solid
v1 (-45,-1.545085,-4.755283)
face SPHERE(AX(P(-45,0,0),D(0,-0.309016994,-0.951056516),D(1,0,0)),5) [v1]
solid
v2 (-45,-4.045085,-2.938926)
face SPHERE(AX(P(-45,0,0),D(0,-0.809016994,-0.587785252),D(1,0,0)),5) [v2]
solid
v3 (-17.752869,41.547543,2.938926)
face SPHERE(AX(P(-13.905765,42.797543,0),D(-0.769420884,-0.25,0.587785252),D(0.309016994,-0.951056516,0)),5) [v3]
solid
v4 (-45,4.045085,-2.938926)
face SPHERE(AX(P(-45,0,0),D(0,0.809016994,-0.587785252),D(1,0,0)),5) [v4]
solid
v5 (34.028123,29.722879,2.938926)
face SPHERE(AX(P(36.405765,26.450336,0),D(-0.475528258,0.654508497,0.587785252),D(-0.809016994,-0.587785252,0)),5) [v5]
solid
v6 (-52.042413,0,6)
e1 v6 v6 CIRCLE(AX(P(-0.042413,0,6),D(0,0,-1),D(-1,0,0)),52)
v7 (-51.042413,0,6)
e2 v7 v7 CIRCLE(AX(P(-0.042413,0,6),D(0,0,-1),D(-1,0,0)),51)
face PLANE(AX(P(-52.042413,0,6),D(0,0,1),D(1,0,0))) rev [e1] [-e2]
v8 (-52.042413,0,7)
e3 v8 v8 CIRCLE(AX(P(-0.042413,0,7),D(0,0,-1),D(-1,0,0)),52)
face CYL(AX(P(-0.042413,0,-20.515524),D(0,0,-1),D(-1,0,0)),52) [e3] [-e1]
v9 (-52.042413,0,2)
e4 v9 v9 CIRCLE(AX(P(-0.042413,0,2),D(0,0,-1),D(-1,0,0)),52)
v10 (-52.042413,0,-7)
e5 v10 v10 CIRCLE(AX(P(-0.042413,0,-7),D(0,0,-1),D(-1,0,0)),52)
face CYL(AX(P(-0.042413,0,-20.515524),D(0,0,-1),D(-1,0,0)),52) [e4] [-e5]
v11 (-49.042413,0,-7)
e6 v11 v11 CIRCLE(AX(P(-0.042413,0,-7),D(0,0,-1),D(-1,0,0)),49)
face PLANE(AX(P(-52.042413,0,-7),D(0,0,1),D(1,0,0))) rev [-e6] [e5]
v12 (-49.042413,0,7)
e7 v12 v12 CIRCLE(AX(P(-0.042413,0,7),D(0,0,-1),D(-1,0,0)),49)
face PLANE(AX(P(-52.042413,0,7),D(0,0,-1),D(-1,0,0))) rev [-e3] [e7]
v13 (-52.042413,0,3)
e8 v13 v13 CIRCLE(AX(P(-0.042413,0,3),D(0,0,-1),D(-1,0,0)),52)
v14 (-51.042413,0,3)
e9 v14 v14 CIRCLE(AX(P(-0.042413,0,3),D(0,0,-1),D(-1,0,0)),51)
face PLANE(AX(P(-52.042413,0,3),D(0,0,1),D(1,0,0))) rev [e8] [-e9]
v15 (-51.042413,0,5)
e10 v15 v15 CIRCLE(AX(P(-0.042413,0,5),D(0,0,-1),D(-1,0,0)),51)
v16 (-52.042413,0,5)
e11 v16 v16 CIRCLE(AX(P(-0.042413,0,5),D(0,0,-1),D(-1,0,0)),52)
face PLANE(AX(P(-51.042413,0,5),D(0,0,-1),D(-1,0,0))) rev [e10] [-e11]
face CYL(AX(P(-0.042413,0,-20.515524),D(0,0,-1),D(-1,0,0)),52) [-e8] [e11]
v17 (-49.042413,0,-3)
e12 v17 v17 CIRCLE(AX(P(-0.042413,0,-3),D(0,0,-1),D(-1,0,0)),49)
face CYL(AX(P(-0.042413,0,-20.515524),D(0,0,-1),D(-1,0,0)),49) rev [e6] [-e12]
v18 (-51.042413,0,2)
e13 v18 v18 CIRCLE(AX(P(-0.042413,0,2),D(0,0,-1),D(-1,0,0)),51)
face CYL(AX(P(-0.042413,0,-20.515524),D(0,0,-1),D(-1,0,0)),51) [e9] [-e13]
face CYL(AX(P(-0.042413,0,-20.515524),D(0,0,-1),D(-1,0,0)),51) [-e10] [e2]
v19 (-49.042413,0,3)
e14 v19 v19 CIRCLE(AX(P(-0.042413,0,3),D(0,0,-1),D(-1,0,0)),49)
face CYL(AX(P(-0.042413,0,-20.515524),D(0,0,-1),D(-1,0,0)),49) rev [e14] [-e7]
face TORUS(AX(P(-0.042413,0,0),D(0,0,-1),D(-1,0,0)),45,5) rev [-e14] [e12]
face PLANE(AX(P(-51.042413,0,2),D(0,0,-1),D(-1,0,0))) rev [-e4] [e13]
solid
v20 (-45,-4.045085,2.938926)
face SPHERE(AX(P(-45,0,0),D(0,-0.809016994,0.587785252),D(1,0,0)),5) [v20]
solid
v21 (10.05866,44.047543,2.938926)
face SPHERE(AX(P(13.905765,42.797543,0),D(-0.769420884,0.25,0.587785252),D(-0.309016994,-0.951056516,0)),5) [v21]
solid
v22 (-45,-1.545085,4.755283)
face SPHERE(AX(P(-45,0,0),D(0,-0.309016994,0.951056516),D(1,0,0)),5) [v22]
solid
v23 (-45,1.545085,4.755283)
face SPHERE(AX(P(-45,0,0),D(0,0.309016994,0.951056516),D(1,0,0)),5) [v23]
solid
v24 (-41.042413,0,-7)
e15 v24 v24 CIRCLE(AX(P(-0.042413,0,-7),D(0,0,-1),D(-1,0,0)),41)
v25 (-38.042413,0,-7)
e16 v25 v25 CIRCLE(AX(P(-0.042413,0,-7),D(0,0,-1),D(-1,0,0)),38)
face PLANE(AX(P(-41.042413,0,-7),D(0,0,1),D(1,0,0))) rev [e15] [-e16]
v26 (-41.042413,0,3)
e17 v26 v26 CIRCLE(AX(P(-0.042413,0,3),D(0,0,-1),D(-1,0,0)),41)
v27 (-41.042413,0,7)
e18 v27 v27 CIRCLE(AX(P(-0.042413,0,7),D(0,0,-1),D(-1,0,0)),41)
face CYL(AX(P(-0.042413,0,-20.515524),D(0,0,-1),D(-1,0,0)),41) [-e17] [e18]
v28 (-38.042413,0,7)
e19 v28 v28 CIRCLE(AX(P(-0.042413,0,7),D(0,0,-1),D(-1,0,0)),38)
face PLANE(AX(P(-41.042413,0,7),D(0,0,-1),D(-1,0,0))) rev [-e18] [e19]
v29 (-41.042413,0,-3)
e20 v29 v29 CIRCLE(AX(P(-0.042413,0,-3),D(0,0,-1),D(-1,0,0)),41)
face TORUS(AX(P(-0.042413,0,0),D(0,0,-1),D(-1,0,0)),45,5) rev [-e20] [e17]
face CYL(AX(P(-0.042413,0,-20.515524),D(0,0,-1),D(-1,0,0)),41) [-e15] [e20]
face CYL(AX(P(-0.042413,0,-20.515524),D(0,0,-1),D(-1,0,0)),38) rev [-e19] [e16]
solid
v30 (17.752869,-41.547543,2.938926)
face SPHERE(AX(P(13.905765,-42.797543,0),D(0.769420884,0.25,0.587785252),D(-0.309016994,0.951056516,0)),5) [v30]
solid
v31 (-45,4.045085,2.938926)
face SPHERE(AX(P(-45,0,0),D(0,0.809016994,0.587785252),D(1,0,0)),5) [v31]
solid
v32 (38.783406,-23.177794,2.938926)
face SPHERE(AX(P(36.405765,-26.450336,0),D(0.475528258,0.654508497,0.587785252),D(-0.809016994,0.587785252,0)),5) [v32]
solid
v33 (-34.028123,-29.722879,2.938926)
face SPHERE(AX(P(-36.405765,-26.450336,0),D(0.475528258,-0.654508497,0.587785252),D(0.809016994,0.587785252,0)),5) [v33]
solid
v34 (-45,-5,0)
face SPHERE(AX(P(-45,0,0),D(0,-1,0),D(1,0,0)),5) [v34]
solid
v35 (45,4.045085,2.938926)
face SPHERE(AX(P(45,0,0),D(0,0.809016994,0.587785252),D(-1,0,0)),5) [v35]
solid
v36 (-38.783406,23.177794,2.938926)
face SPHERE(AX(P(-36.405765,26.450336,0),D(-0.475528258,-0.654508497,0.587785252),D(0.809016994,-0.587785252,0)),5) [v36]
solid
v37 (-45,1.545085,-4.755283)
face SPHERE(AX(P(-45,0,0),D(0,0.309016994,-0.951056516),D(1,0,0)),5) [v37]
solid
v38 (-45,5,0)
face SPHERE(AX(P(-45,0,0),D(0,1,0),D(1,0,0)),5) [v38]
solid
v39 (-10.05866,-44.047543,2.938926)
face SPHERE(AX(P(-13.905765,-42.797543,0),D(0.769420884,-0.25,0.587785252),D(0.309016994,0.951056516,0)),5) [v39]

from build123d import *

# Parameters (mm, degrees)
CIRPATTERN1_COUNT   = 10
CIRPATTERN2_ANGLE   = 180
CIRPATTERN2_2_ANGLE = 180
CIRPATTERN2_3_ANGLE = 180
CIRPATTERN2_4_ANGLE = 180
CIRPATTERN2_5_ANGLE = 180
CIRPATTERN2_6_ANGLE = 180
CIRPATTERN2_7_ANGLE = 180
CIRPATTERN2_8_ANGLE = 180
CIRPATTERN2_9_ANGLE = 180


with BuildPart() as part:
    # Sketch2 → Revolve1 (revolve)
    with BuildSketch(Plane.XZ):
        with BuildLine():
            Line((-52.042412723, -7), (-49.042412723, -7))
            Line((-49.042412723, -7), (-49.042412723, -3))
            ThreePointArc((-49.042412723, -3), (-50.042412723, 0), (-49.042412723, 3))
            Line((-49.042412723, 3), (-49.042412723, 7))
            Line((-49.042412723, 7), (-52.042412723, 7))
            Line((-52.042412723, 7), (-52.042412723, 6))
            Line((-52.042412723, 6), (-51.042412723, 6))
            Line((-51.042412723, 6), (-51.042412723, 5))
            Line((-51.042412723, 5), (-52.042412723, 5))
            Line((-52.042412723, 5), (-52.042412723, 3))
            Line((-52.042412723, 3), (-51.042412723, 3))
            Line((-51.042412723, 3), (-51.042412723, 2))
            Line((-51.042412723, 2), (-52.042412723, 2))
            Line((-52.042412723, 2), (-52.042412723, -7))
        make_face()
        with BuildLine():
            Line((-38.042412723, -7), (-38.042412723, 7))
            Line((-38.042412723, 7), (-41.042412723, 7))
            Line((-41.042412723, 7), (-41.042412723, 3))
            ThreePointArc((-41.042412723, 3), (-40.042412723, 0), (-41.042412723, -3))
            Line((-41.042412723, -3), (-41.042412723, -7))
            Line((-41.042412723, -7), (-38.042412723, -7))
        make_face()
    revolve(axis=Axis((-0.042412723, 0, -20.515524483), (0, 0, 1)))


with BuildPart() as body_2:
    # Sketch3 → Revolve2 (revolve)
    with BuildSketch(Plane.XY):
        with BuildLine():
            Line((-45, 5), (-45, -5))
            ThreePointArc((-45, -5), (-40, 0), (-45, 5))
        make_face()
    revolve(axis=Axis((-45, 42.158378663, 0), (0, -1, 0)))


with BuildPart() as cirpattern1_1:
    # CirPattern1: pattern copy
    add(body_2.part.rotate(Axis((-19.44032735, 0, 0), (1, 0, 0)), 1 * 360 / CIRPATTERN1_COUNT))


with BuildPart() as cirpattern1_2:
    # CirPattern1: pattern copy
    add(body_2.part.rotate(Axis((-19.44032735, 0, 0), (1, 0, 0)), 2 * 360 / CIRPATTERN1_COUNT))


with BuildPart() as cirpattern1_3:
    # CirPattern1: pattern copy
    add(body_2.part.rotate(Axis((-19.44032735, 0, 0), (1, 0, 0)), 3 * 360 / CIRPATTERN1_COUNT))


with BuildPart() as cirpattern1_4:
    # CirPattern1: pattern copy
    add(body_2.part.rotate(Axis((-19.44032735, 0, 0), (1, 0, 0)), 4 * 360 / CIRPATTERN1_COUNT))


with BuildPart() as cirpattern1_5:
    # CirPattern1: pattern copy
    add(body_2.part.rotate(Axis((-19.44032735, 0, 0), (1, 0, 0)), 5 * 360 / CIRPATTERN1_COUNT))


with BuildPart() as cirpattern1_6:
    # CirPattern1: pattern copy
    add(body_2.part.rotate(Axis((-19.44032735, 0, 0), (1, 0, 0)), 6 * 360 / CIRPATTERN1_COUNT))


with BuildPart() as cirpattern1_7:
    # CirPattern1: pattern copy
    add(body_2.part.rotate(Axis((-19.44032735, 0, 0), (1, 0, 0)), 7 * 360 / CIRPATTERN1_COUNT))


with BuildPart() as cirpattern1_8:
    # CirPattern1: pattern copy
    add(body_2.part.rotate(Axis((-19.44032735, 0, 0), (1, 0, 0)), 8 * 360 / CIRPATTERN1_COUNT))


with BuildPart() as cirpattern1_9:
    # CirPattern1: pattern copy
    add(body_2.part.rotate(Axis((-19.44032735, 0, 0), (1, 0, 0)), 9 * 360 / CIRPATTERN1_COUNT))


with BuildPart() as body_12:
    # CirPattern2: read off the stored shape, not the designer's step
    # CirPattern2: copy of body 2
    add(body_2.part.rotate(Axis((0, 0, 0), (0.9510565163, 0.3090169944, 0)), CIRPATTERN2_ANGLE))


with BuildPart() as body_13:
    # CirPattern2 2: copy of body 2
    add(body_2.part.rotate(Axis((0, 0, 0), (0.8090169944, 0.5877852523, 0)), CIRPATTERN2_2_ANGLE))


with BuildPart() as body_14:
    # CirPattern2 3: copy of body 2
    add(body_2.part.rotate(Axis((0, 0, 0), (0.5877852523, 0.8090169944, 0)), CIRPATTERN2_3_ANGLE))


with BuildPart() as body_15:
    # CirPattern2 4: copy of body 2
    add(body_2.part.rotate(Axis((0, 0, 0), (0.3090169944, 0.9510565163, 0)), CIRPATTERN2_4_ANGLE))


with BuildPart() as body_16:
    # CirPattern2 5: copy of body 2
    add(body_2.part.rotate(Axis((0, 0, 0), (0, 1, 0)), CIRPATTERN2_5_ANGLE))


with BuildPart() as body_17:
    # CirPattern2 6: copy of body 2
    add(body_2.part.rotate(Axis((0, 0, 0), (0.3090169944, -0.9510565163, 0)), CIRPATTERN2_6_ANGLE))


with BuildPart() as body_18:
    # CirPattern2 7: copy of body 2
    add(body_2.part.rotate(Axis((0, 0, 0), (0.5877852523, -0.8090169944, 0)), CIRPATTERN2_7_ANGLE))


with BuildPart() as body_19:
    # CirPattern2 8: copy of body 2
    add(body_2.part.rotate(Axis((0, 0, 0), (0.8090169944, -0.5877852523, 0)), CIRPATTERN2_8_ANGLE))


with BuildPart() as body_20:
    # CirPattern2 9: copy of body 2
    add(body_2.part.rotate(Axis((0, 0, 0), (0.9510565163, -0.3090169944, 0)), CIRPATTERN2_9_ANGLE))


solid = Compound([part.part, body_2.part, cirpattern1_1.part, cirpattern1_2.part, cirpattern1_3.part, cirpattern1_4.part, cirpattern1_5.part, cirpattern1_6.part, cirpattern1_7.part, cirpattern1_8.part, cirpattern1_9.part, body_12.part, body_13.part, body_14.part, body_15.part, body_16.part, body_17.part, body_18.part, body_19.part, body_20.part])
